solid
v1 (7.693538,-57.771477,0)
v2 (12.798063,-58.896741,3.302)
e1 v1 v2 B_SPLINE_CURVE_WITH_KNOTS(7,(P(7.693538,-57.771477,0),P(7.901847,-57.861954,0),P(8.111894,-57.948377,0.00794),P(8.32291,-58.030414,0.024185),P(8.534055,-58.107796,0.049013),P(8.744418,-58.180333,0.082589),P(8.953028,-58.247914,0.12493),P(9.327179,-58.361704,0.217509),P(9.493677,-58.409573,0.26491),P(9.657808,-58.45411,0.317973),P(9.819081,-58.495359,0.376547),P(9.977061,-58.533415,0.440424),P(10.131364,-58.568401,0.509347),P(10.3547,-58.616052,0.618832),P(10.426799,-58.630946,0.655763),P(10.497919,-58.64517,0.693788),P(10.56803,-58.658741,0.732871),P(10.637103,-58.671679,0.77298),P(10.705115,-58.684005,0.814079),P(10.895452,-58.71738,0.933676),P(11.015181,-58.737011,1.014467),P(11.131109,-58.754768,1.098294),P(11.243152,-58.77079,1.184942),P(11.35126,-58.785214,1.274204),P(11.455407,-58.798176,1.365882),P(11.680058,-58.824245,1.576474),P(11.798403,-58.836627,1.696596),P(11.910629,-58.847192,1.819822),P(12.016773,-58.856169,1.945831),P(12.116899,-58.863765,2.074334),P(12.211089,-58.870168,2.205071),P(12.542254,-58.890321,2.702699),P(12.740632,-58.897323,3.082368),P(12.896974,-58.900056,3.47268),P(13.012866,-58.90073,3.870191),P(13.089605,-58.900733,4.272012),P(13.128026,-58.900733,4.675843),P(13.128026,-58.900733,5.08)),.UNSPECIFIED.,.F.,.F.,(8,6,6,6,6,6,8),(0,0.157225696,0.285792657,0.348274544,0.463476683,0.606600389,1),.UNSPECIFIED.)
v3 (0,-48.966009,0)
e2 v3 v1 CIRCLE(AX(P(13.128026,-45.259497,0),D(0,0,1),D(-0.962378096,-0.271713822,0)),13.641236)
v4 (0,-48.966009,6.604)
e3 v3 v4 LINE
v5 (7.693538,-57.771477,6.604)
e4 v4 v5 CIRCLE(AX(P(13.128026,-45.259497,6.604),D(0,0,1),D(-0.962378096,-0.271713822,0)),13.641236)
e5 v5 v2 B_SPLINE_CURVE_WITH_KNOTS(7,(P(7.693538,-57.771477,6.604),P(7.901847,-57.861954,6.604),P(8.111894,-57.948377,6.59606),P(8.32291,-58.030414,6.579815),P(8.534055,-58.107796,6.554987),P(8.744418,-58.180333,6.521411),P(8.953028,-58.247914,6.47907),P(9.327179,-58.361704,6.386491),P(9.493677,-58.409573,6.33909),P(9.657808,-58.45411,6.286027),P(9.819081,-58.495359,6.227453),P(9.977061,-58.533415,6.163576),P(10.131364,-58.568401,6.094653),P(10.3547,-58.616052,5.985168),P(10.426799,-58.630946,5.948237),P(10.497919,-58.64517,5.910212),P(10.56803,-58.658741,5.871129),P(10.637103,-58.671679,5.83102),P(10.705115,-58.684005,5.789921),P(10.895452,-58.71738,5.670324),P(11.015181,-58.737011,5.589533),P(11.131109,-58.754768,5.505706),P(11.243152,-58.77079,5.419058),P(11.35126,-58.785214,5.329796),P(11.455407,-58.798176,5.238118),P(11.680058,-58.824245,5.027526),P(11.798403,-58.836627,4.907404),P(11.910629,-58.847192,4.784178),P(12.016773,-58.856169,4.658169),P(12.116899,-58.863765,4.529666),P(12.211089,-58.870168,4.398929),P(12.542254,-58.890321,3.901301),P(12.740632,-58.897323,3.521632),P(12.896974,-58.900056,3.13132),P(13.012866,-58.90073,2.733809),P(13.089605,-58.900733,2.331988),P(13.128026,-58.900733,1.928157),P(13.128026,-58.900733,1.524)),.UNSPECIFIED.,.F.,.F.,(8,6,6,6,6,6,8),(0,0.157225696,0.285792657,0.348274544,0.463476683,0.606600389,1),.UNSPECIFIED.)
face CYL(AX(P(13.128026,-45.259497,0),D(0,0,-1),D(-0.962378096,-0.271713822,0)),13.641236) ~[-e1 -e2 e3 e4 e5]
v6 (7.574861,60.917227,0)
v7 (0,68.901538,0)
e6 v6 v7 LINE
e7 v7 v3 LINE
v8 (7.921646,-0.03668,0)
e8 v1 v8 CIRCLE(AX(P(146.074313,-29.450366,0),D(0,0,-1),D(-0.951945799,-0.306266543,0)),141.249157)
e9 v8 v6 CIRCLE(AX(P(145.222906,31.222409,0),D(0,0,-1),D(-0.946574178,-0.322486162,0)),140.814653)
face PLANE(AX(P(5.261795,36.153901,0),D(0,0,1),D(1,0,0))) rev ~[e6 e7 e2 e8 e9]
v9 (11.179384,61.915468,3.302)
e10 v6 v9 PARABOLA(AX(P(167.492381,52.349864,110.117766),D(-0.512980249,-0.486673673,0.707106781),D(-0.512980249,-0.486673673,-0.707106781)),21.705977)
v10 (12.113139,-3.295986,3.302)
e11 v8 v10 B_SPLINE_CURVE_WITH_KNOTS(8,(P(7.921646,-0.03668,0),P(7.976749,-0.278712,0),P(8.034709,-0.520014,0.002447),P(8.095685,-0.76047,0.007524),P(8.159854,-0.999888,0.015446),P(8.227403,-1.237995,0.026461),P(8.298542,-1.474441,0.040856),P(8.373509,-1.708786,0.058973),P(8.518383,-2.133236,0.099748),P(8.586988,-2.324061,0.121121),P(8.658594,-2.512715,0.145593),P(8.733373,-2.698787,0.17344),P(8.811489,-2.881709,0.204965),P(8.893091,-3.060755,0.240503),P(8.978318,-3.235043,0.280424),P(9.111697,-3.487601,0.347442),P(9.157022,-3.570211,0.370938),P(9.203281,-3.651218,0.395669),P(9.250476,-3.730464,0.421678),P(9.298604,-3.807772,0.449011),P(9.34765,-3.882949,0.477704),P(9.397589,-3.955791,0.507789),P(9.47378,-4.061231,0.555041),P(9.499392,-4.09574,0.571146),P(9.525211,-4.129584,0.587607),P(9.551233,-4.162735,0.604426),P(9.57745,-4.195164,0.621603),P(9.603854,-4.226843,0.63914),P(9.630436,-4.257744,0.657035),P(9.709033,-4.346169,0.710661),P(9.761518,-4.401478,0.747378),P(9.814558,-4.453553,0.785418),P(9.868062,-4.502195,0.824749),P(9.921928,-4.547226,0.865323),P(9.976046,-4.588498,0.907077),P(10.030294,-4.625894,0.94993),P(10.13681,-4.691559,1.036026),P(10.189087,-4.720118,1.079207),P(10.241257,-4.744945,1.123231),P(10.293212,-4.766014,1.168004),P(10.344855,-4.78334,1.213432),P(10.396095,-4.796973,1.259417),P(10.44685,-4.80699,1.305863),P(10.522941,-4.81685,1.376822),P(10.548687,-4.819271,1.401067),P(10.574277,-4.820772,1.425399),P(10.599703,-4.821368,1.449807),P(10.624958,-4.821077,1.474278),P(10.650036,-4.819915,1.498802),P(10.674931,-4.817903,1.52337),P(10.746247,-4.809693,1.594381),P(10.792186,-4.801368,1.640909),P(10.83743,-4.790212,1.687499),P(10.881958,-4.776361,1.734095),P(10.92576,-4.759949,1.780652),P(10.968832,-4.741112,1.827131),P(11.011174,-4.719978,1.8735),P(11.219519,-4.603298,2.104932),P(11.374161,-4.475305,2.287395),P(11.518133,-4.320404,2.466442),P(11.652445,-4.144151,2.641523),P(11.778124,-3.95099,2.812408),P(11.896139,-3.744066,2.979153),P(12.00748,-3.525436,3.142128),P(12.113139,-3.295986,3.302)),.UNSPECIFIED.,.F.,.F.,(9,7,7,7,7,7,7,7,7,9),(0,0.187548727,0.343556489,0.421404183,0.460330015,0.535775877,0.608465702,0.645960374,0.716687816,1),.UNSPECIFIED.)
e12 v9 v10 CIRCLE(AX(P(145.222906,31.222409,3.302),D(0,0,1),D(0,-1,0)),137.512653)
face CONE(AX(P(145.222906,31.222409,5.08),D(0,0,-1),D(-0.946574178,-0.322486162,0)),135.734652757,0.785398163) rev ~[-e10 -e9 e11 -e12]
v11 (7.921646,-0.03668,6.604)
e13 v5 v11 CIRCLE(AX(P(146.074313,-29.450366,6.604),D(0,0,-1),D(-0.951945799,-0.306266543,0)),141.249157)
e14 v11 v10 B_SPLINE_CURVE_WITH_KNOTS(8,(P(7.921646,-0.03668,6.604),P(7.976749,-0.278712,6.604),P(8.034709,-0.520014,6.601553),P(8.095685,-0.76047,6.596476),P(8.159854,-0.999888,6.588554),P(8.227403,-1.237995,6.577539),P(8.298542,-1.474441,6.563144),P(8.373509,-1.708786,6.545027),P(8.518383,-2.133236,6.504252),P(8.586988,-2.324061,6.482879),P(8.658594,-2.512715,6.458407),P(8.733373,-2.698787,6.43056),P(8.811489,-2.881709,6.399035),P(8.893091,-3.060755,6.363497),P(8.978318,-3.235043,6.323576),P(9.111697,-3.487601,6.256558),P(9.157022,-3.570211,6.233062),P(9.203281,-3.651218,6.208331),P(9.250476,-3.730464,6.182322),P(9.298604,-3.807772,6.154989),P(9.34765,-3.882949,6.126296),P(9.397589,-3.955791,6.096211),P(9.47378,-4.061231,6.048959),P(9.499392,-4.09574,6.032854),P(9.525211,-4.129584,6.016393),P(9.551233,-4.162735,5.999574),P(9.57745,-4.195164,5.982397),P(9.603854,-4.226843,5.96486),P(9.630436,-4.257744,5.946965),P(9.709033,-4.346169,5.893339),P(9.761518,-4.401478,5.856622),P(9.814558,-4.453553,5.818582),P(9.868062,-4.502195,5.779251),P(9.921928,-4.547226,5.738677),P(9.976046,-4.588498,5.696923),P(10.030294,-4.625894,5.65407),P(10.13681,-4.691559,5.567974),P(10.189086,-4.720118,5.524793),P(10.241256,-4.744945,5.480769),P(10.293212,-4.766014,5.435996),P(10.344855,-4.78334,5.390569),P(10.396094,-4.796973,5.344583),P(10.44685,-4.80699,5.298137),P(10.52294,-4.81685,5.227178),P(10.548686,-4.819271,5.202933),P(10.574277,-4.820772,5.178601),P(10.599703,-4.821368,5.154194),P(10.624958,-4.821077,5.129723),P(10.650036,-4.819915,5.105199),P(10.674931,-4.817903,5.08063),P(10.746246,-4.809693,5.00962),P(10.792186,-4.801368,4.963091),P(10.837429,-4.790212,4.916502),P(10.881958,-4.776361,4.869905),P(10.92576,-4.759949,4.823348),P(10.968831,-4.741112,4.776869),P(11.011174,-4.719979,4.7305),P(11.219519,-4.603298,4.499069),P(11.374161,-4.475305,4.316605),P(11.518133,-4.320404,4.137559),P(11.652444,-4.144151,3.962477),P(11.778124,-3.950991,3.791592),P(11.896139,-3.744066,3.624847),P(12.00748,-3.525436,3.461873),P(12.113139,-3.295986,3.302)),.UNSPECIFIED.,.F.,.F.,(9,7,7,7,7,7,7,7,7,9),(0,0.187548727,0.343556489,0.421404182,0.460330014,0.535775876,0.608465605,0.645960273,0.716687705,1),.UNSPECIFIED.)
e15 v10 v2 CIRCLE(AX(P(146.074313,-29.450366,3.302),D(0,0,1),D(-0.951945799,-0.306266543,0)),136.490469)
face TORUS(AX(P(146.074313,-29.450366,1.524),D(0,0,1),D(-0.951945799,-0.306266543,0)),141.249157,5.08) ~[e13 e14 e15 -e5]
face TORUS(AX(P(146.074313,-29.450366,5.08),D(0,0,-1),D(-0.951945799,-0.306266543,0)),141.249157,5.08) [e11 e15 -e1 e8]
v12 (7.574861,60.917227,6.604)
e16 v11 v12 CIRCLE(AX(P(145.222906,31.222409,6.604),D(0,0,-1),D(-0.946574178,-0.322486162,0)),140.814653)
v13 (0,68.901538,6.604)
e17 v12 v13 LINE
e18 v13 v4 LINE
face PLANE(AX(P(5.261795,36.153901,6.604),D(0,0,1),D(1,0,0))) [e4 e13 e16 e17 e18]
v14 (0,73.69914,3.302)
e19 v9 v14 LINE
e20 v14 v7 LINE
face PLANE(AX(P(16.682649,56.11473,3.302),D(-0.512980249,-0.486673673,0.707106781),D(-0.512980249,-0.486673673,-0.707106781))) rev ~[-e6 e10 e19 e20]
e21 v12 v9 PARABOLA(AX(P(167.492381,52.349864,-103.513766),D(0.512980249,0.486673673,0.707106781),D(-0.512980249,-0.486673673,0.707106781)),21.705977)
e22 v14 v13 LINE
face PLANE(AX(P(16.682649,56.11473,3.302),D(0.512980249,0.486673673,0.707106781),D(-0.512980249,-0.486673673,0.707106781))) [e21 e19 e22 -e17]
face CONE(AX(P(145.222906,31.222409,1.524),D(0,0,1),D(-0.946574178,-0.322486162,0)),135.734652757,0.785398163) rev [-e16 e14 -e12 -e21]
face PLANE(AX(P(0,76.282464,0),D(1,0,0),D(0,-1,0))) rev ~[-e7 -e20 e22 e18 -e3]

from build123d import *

# Parameters (mm, degrees)
F1_DEPTH    = 6.604
F2_T2_ANGLE = 37.6266885083
F2_T4_ANGLE = 37.6266885083
F3_T1_DEPTH = 39.1771149622
F4_T2_ANGLE = 30.7081908039
F4_T4_ANGLE = 30.7081908039


# Not quite as in the source:
# - a fillet or chamfer that OpenCascade refuses, or shapes differently, is made with other operations: its cross-section is extruded or revolved along the edge and cut away or added
# - ends of sketch curves that miss each other by under 0.0002 mm in the source are joined


with BuildPart() as f1:
    # F0 (on Top) → F1 (new body)
    with BuildSketch(Plane.XY):
        with BuildLine():
            Line((0, 76.2824639678), (0, 0))
            Line((0, 0), (13.1280263886, 0))
            ThreePointArc((13.1280263886, 0), (9.4882529844, 31.2224067748), (13.1280263886, 62.4448174897))
            Line((13.1280263886, 62.4448174897), (0, 76.2824639678))
        make_face()
        with BuildLine():
            Line((13.1280263886, 0), (0, 0))
            Line((0, 0), (0, -48.9660091698))
            ThreePointArc((0, -48.9660091698), (4.8963223511, -56.1371050306), (13.1280263886, -58.900732547))
            ThreePointArc((13.1280263886, -58.900732547), (9.9051564545, -29.4503682436), (13.1280263886, 0))
        make_face()
    extrude(amount=F1_DEPTH)

    # F2: chamfer of 5.08 on 2 edges, made by hand

    # F2_s1 → F2_t2 (revolve, cut)
    with BuildSketch(Plane(origin=(5.5719325615, -16.3549575283, 0), x_dir=(0, 0, 1), z_dir=(0.3224861622, -0.9465741784, 0))):
        Polygon((1.524, -11.7983946988), (6.604, -6.7183946988), (6.604, -11.7983946988), align=None)
    revolve(axis=Axis((145.2229057415, 31.2224087449, 6.604), (0, 0, -1)), revolution_arc=F2_T2_ANGLE, mode=Mode.SUBTRACT)

    # F2_s3 → F2_t4 (revolve, cut)
    with BuildSketch(Plane(origin=(5.5719325615, -16.3549575283, 0), x_dir=(0, 0, 1), z_dir=(0.3224861622, -0.9465741784, 0))):
        Polygon((5.08, -11.7983946988), (0, -6.7183946988), (0, -11.7983946988), align=None)
    revolve(axis=Axis((145.2229057415, 31.2224087449, 0), (0, 0, -1)), revolution_arc=F2_T4_ANGLE, mode=Mode.SUBTRACT)

    # F3: chamfer of 5.08 on 2 edges, made by hand

    # F3_s2 → F3_t1 (cut)
    with BuildSketch(Plane(origin=(-20.115918924, 21.2032613595, 0), x_dir=(0, 0, 1), z_dir=(-0.6882605094, 0.725463625, 0))):
        Polygon((5.08, 52.5022075061), (0, 47.4222075061), (0, 52.5022075061), align=None)
        Polygon((1.524, 52.5022075061), (6.604, 47.4222075061), (6.604, 52.5022075061), align=None)
    extrude(amount=F3_T1_DEPTH, mode=Mode.SUBTRACT)

    # F4: fillet of radius 5.08 on 2 edges, made by hand

    # F4_s1 → F4_t2 (revolve, cut)
    with BuildSketch(Plane(origin=(22.2878822439, -69.2757873609, 0), x_dir=(0, 0, 1), z_dir=(0.3062665426, -0.9519457994, 0))):
        with BuildLine():
            ThreePointArc((6.604, 11.2139897709), (5.1161024484, 7.6218873224), (1.524, 6.1339897709))
            Line((1.524, 6.1339897709), (6.604, 6.1339897709))
            Line((6.604, 6.1339897709), (6.604, 11.2139897709))
        make_face()
    revolve(axis=Axis((146.0743134808, -29.4503662735, 6.604), (0, 0, -1)), revolution_arc=F4_T2_ANGLE, mode=Mode.SUBTRACT)

    # F4_s3 → F4_t4 (revolve, cut)
    with BuildSketch(Plane(origin=(22.2878822439, -69.2757873609, 0), x_dir=(0, 0, 1), z_dir=(0.3062665426, -0.9519457994, 0))):
        with BuildLine():
            ThreePointArc((0, 11.2139897709), (1.4878975516, 7.6218873224), (5.08, 6.1339897709))
            Line((5.08, 6.1339897709), (0, 6.1339897709))
            Line((0, 6.1339897709), (0, 11.2139897709))
        make_face()
    revolve(axis=Axis((146.0743134808, -29.4503662735, 0), (0, 0, -1)), revolution_arc=F4_T4_ANGLE, mode=Mode.SUBTRACT)


solid = f1.part
